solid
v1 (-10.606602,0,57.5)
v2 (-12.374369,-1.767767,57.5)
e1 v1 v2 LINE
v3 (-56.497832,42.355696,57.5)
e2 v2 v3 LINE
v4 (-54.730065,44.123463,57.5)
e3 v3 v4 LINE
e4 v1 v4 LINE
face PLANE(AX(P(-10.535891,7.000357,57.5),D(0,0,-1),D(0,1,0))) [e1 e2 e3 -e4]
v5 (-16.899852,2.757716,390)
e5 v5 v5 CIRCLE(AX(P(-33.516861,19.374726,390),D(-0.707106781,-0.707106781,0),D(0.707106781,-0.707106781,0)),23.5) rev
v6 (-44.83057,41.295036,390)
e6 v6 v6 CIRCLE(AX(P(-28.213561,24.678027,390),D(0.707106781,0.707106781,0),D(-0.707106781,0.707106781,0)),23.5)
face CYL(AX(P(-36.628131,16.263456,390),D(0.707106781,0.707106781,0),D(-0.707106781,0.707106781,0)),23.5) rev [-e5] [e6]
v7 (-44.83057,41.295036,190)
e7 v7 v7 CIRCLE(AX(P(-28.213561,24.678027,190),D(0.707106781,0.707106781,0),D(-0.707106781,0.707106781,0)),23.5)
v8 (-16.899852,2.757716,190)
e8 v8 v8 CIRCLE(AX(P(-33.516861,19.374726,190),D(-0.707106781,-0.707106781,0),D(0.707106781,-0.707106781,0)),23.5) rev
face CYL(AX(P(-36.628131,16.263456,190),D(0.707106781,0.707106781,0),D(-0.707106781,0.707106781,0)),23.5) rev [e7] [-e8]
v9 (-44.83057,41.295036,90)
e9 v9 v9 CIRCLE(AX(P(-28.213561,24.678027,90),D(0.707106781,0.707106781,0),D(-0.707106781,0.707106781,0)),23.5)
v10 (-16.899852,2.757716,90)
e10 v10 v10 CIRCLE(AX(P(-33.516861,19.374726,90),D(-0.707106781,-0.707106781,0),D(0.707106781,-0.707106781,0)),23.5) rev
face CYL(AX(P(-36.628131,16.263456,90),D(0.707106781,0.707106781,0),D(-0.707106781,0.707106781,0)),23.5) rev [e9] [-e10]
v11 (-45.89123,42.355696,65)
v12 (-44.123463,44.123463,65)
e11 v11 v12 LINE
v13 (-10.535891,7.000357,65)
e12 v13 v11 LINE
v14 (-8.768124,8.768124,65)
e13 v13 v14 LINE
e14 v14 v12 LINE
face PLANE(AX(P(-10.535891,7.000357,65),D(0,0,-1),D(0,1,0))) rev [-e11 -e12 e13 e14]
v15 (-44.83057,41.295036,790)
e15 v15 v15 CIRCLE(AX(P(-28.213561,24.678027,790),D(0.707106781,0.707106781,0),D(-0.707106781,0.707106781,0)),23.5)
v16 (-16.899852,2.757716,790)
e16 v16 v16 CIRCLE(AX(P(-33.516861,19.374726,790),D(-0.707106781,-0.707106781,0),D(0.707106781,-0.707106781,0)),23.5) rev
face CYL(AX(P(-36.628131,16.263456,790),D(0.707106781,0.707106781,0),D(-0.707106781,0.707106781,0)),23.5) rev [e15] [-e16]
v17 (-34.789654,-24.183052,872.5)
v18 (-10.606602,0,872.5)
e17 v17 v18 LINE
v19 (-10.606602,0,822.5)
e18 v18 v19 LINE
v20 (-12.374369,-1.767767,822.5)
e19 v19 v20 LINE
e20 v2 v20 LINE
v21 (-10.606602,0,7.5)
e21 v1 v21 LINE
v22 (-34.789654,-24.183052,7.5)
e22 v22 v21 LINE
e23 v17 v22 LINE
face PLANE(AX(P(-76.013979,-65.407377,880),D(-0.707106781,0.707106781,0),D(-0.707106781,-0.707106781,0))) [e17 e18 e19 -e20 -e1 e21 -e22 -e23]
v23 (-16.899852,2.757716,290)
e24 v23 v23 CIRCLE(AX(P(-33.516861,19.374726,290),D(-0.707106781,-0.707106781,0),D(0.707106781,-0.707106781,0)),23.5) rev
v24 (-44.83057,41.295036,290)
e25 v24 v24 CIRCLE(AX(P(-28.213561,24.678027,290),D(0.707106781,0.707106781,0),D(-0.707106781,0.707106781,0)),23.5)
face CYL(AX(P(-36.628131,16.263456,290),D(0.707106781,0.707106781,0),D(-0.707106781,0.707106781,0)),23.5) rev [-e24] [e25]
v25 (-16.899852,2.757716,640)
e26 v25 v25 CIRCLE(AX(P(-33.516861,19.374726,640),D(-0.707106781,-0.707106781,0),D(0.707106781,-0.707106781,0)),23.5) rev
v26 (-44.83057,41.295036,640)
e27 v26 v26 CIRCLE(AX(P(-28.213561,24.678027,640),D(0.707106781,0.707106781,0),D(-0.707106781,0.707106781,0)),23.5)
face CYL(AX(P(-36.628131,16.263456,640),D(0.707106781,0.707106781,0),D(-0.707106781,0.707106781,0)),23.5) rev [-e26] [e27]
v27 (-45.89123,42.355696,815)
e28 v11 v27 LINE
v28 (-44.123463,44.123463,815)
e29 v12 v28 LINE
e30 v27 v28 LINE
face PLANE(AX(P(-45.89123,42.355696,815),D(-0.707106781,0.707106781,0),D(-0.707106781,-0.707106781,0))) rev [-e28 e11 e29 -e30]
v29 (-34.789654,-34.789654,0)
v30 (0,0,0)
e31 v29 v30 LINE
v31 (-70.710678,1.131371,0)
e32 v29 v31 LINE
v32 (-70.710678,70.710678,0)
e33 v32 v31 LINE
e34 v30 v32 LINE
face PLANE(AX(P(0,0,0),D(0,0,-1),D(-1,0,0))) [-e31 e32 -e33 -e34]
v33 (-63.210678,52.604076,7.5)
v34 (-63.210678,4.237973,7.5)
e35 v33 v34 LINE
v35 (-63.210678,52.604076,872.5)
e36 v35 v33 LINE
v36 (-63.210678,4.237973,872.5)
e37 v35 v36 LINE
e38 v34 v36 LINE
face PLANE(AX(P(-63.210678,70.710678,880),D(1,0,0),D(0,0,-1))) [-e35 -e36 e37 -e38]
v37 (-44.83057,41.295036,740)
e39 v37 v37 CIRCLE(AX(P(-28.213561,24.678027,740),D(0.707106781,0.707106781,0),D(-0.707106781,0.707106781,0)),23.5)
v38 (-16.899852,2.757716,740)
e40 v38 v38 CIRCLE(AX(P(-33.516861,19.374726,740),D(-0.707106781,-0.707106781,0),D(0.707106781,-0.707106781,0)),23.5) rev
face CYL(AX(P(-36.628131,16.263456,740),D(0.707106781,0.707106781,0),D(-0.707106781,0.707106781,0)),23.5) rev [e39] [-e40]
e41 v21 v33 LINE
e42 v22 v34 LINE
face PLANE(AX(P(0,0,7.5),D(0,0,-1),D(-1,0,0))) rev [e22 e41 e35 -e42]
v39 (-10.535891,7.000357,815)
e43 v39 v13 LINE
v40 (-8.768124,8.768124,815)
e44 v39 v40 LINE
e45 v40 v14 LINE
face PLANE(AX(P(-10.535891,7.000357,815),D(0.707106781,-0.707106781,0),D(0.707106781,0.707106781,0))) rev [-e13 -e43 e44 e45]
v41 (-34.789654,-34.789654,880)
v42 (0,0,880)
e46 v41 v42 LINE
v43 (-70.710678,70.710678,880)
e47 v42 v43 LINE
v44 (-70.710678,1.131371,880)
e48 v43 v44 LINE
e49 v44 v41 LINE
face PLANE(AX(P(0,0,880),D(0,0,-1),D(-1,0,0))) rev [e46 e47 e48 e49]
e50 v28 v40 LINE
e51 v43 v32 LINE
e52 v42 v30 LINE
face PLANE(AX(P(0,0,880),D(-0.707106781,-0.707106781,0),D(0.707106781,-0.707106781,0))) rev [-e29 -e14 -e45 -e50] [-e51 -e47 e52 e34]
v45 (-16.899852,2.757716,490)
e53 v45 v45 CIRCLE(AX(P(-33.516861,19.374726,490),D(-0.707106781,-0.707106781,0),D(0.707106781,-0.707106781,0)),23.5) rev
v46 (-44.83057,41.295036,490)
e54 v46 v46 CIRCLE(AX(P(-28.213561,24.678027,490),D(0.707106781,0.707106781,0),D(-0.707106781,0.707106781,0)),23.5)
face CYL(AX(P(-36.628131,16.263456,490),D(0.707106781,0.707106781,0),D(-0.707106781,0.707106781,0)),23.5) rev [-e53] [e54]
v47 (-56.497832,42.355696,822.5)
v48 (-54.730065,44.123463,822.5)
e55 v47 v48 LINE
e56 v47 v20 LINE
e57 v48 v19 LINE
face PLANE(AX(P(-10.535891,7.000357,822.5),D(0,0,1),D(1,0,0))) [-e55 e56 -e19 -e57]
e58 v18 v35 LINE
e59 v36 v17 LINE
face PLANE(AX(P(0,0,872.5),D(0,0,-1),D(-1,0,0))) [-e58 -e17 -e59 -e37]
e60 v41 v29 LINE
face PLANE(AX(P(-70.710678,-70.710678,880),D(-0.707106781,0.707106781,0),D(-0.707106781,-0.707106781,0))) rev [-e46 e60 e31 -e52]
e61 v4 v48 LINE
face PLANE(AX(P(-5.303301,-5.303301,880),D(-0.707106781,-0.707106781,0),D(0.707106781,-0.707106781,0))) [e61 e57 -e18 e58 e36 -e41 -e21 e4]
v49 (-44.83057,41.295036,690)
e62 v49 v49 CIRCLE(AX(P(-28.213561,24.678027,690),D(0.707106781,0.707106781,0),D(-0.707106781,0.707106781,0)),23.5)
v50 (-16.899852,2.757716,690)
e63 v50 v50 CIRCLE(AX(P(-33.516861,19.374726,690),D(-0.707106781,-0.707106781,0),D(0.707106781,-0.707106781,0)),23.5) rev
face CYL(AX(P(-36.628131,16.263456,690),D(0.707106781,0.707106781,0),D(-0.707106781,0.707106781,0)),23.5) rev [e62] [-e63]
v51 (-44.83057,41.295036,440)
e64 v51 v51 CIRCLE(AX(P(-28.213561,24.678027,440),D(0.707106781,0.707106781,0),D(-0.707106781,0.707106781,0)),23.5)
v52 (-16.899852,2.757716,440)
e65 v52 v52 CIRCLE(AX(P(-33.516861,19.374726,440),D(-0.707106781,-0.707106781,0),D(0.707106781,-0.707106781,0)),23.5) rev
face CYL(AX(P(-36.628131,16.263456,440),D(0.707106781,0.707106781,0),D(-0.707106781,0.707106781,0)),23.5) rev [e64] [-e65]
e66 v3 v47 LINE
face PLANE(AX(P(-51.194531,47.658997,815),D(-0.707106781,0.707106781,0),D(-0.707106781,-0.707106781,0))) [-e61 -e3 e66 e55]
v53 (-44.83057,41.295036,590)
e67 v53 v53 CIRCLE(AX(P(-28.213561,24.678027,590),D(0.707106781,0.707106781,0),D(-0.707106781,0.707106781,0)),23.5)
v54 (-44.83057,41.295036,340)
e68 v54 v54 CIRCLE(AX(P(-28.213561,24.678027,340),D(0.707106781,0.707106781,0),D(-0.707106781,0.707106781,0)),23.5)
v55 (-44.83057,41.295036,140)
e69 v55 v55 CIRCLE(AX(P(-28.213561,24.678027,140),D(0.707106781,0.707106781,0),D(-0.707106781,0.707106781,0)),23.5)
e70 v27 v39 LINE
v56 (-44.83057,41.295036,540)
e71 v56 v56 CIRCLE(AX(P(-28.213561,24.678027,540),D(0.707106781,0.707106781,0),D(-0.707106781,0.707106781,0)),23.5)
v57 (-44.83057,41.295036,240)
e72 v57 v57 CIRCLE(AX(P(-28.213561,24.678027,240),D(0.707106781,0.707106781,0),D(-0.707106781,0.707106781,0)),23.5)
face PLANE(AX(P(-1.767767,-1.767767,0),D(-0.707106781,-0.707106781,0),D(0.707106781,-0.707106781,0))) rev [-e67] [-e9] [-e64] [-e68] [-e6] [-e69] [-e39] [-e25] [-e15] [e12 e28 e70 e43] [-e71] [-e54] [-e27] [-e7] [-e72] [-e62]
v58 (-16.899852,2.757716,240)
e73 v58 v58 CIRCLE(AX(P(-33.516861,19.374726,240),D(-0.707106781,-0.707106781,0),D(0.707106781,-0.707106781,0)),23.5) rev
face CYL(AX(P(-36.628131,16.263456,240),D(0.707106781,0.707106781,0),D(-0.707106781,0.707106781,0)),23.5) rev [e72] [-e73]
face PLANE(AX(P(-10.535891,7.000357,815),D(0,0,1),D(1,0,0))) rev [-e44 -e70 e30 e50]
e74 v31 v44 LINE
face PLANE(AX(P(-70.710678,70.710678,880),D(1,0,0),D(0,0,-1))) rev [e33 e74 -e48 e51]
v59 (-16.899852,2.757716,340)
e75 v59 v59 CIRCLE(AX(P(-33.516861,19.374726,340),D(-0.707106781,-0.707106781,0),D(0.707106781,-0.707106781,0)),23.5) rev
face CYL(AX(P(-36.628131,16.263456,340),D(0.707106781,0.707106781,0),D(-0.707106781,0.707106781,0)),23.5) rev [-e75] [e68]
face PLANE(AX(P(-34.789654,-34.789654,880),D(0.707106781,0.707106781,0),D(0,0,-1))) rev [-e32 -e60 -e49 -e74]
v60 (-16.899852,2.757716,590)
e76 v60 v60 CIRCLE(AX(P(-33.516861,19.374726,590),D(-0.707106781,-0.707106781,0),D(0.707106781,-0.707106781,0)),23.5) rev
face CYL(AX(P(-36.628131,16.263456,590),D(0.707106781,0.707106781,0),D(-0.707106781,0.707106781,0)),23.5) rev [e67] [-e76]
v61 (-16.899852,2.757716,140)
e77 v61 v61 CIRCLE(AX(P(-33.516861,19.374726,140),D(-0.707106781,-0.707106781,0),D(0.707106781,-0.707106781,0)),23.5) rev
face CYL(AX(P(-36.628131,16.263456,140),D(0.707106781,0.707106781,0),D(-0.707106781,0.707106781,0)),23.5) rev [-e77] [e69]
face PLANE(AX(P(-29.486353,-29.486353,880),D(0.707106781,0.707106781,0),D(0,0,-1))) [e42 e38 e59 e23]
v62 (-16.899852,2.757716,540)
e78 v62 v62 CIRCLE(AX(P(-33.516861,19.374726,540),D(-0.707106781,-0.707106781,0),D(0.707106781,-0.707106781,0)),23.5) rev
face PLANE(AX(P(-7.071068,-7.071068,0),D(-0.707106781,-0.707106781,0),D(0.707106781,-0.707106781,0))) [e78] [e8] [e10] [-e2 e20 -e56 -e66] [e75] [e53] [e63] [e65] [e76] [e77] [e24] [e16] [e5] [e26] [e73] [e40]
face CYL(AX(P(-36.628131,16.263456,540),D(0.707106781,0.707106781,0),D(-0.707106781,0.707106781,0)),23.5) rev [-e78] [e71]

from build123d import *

# Parameters (mm, degrees)
BOSS_EXTRUDE1_DEPTH = 880
CHAMFER1_SIZE       = 50.8
CHAMFER1_SIZE2      = 71.842048969
SKETCH3_W           = 750
SKETCH3_H           = 50
CUT_EXTRUDE1_DEPTH  = 2.5
SKETCH4_R           = 23.5
CUT_EXTRUDE2_DEPTH  = 11.9
SHELL1_START        = -14.4
SHELL1_OUTLINE_W    = 62.4
SHELL1_OUTLINE_H    = 765
SHELL1_OUTLINE_R    = 23.5
SHELL1_DEPTH        = 4.4
SHELL1_START_2      = 7.5
SHELL1_2_DEPTH      = 865
SHELL1_3_DEPTH      = 50
SHELL1_START_3      = 822.5
SHELL1_4_DEPTH      = 50


with BuildPart() as part:
    # Sketch1 → Boss-Extrude1 (new body)
    with BuildSketch(Plane.XY):
        Polygon((-70.710678119, 70.710678119), (-70.710678119, -70.710678119), (0, 0), align=None)
    extrude(amount=BOSS_EXTRUDE1_DEPTH)

    # Chamfer1
    chamfer1_edges = [part.edges().sort_by_distance(p)[0] for p in [
        (-70.710678119, -70.710678119, 440),
    ]]
    chamfer1_side = [part.faces().sort_by_distance(p)[0] for p in [
        (-35.355339059, -35.355339059, 440),
    ]]
    chamfer(chamfer1_edges, length=CHAMFER1_SIZE, length2=CHAMFER1_SIZE2, reference=chamfer1_side[0])

    # Sketch3 → Cut-Extrude1 (cut)
    with BuildSketch(Plane(origin=(0, 0, 0), x_dir=(0, 0, -1), z_dir=(0.7071067811865493, 0.7071067811865457, 0))):
        with Locations((-440, 37.4)):
            Rectangle(SKETCH3_W, SKETCH3_H)
    extrude(amount=-CUT_EXTRUDE1_DEPTH, mode=Mode.SUBTRACT)

    # Sketch4 → Cut-Extrude2 (cut)
    with BuildSketch(Plane(origin=(-1.767766953, -1.767766953, 0), x_dir=(0, 0, -1), z_dir=(0.7071067811865652, 0.7071067811865298, 0))):
        with Locations(Location((-440, 37.4, 0), (0, 0, 90))):
            Circle(SKETCH4_R)
        with Locations(Location((-490, 37.4, 0), (0, 0, 90))):
            Circle(SKETCH4_R)
        with Locations(Location((-540, 37.4, 0), (0, 0, 90))):
            Circle(SKETCH4_R)
        with Locations(Location((-590, 37.4, 0), (0, 0, 90))):
            Circle(SKETCH4_R)
        with Locations(Location((-640, 37.4, 0), (0, 0, 90))):
            Circle(SKETCH4_R)
        with Locations(Location((-690, 37.4, 0), (0, 0, 90))):
            Circle(SKETCH4_R)
        with Locations(Location((-740, 37.4, 0), (0, 0, 90))):
            Circle(SKETCH4_R)
        with Locations(Location((-790, 37.4, 0), (0, 0, 90))):
            Circle(SKETCH4_R)
        with Locations(Location((-390, 37.4, 0), (0, 0, 90))):
            Circle(SKETCH4_R)
        with Locations(Location((-340, 37.4, 0), (0, 0, 90))):
            Circle(SKETCH4_R)
        with Locations(Location((-290, 37.4, 0), (0, 0, 90))):
            Circle(SKETCH4_R)
        with Locations(Location((-240, 37.4, 0), (0, 0, 90))):
            Circle(SKETCH4_R)
        with Locations(Location((-190, 37.4, 0), (0, 0, 90))):
            Circle(SKETCH4_R)
        with Locations(Location((-140, 37.4, 0), (0, 0, 90))):
            Circle(SKETCH4_R)
        with Locations(Location((-90, 37.4, 0), (0, 0, 90))):
            Circle(SKETCH4_R)
    extrude(amount=-CUT_EXTRUDE2_DEPTH, mode=Mode.SUBTRACT)

    # Shell1: read off the stored shape, not the designer's step
    # Shell1 outline → Shell1 (cut)
    with BuildSketch(Plane(origin=(0, 0, 0), x_dir=(0.7071067811865474, -0.7071067811865477, 0), z_dir=(0.7071067811865476, 0.7071067811865476, 0)).offset(SHELL1_START)):
        with Locations((-38.7, -440)):
            Rectangle(SHELL1_OUTLINE_W, SHELL1_OUTLINE_H)
        with Locations((-37.4, -790)):
            Circle(SHELL1_OUTLINE_R, mode=Mode.SUBTRACT)
        with Locations((-37.4, -740)):
            Circle(SHELL1_OUTLINE_R, mode=Mode.SUBTRACT)
        with Locations((-37.4, -690)):
            Circle(SHELL1_OUTLINE_R, mode=Mode.SUBTRACT)
        with Locations((-37.4, -640)):
            Circle(SHELL1_OUTLINE_R, mode=Mode.SUBTRACT)
        with Locations((-37.4, -590)):
            Circle(SHELL1_OUTLINE_R, mode=Mode.SUBTRACT)
        with Locations((-37.4, -540)):
            Circle(SHELL1_OUTLINE_R, mode=Mode.SUBTRACT)
        with Locations((-37.4, -490)):
            Circle(SHELL1_OUTLINE_R, mode=Mode.SUBTRACT)
        with Locations((-37.4, -440)):
            Circle(SHELL1_OUTLINE_R, mode=Mode.SUBTRACT)
        with Locations((-37.4, -390)):
            Circle(SHELL1_OUTLINE_R, mode=Mode.SUBTRACT)
        with Locations((-37.4, -340)):
            Circle(SHELL1_OUTLINE_R, mode=Mode.SUBTRACT)
        with Locations((-37.4, -290)):
            Circle(SHELL1_OUTLINE_R, mode=Mode.SUBTRACT)
        with Locations((-37.4, -240)):
            Circle(SHELL1_OUTLINE_R, mode=Mode.SUBTRACT)
        with Locations((-37.4, -190)):
            Circle(SHELL1_OUTLINE_R, mode=Mode.SUBTRACT)
        with Locations((-37.4, -140)):
            Circle(SHELL1_OUTLINE_R, mode=Mode.SUBTRACT)
        with Locations((-37.4, -90)):
            Circle(SHELL1_OUTLINE_R, mode=Mode.SUBTRACT)
    extrude(amount=SHELL1_DEPTH, mode=Mode.SUBTRACT)

    # Shell1 2 outline → Shell1 2 (cut)
    with BuildSketch(Plane.XY.offset(SHELL1_START_2)):
        Polygon((-54.730064864, 44.123463146), (-63.210678119, 52.604076401), (-63.210678119, 4.237972568), (-34.789653634, -24.183051917), (-15.485638508, -4.87903679), (-59.609101654, 39.244426356), align=None)
    extrude(amount=SHELL1_2_DEPTH, mode=Mode.SUBTRACT)

    # Shell1 3 outline → Shell1 3 (cut)
    with BuildSketch(Plane.XY.offset(SHELL1_START_2)):
        Polygon((-10.606601718, 0), (-54.730064864, 44.123463146), (-59.609101654, 39.244426356), (-15.485638508, -4.87903679), align=None)
    extrude(amount=SHELL1_3_DEPTH, mode=Mode.SUBTRACT)

    # Shell1 4 outline → Shell1 4 (cut)
    with BuildSketch(Plane.XY.offset(SHELL1_START_3)):
        Polygon((-10.606601718, 0), (-54.730064864, 44.123463146), (-59.609101654, 39.244426356), (-15.485638508, -4.87903679), align=None)
    extrude(amount=SHELL1_4_DEPTH, mode=Mode.SUBTRACT)


solid = part.part
